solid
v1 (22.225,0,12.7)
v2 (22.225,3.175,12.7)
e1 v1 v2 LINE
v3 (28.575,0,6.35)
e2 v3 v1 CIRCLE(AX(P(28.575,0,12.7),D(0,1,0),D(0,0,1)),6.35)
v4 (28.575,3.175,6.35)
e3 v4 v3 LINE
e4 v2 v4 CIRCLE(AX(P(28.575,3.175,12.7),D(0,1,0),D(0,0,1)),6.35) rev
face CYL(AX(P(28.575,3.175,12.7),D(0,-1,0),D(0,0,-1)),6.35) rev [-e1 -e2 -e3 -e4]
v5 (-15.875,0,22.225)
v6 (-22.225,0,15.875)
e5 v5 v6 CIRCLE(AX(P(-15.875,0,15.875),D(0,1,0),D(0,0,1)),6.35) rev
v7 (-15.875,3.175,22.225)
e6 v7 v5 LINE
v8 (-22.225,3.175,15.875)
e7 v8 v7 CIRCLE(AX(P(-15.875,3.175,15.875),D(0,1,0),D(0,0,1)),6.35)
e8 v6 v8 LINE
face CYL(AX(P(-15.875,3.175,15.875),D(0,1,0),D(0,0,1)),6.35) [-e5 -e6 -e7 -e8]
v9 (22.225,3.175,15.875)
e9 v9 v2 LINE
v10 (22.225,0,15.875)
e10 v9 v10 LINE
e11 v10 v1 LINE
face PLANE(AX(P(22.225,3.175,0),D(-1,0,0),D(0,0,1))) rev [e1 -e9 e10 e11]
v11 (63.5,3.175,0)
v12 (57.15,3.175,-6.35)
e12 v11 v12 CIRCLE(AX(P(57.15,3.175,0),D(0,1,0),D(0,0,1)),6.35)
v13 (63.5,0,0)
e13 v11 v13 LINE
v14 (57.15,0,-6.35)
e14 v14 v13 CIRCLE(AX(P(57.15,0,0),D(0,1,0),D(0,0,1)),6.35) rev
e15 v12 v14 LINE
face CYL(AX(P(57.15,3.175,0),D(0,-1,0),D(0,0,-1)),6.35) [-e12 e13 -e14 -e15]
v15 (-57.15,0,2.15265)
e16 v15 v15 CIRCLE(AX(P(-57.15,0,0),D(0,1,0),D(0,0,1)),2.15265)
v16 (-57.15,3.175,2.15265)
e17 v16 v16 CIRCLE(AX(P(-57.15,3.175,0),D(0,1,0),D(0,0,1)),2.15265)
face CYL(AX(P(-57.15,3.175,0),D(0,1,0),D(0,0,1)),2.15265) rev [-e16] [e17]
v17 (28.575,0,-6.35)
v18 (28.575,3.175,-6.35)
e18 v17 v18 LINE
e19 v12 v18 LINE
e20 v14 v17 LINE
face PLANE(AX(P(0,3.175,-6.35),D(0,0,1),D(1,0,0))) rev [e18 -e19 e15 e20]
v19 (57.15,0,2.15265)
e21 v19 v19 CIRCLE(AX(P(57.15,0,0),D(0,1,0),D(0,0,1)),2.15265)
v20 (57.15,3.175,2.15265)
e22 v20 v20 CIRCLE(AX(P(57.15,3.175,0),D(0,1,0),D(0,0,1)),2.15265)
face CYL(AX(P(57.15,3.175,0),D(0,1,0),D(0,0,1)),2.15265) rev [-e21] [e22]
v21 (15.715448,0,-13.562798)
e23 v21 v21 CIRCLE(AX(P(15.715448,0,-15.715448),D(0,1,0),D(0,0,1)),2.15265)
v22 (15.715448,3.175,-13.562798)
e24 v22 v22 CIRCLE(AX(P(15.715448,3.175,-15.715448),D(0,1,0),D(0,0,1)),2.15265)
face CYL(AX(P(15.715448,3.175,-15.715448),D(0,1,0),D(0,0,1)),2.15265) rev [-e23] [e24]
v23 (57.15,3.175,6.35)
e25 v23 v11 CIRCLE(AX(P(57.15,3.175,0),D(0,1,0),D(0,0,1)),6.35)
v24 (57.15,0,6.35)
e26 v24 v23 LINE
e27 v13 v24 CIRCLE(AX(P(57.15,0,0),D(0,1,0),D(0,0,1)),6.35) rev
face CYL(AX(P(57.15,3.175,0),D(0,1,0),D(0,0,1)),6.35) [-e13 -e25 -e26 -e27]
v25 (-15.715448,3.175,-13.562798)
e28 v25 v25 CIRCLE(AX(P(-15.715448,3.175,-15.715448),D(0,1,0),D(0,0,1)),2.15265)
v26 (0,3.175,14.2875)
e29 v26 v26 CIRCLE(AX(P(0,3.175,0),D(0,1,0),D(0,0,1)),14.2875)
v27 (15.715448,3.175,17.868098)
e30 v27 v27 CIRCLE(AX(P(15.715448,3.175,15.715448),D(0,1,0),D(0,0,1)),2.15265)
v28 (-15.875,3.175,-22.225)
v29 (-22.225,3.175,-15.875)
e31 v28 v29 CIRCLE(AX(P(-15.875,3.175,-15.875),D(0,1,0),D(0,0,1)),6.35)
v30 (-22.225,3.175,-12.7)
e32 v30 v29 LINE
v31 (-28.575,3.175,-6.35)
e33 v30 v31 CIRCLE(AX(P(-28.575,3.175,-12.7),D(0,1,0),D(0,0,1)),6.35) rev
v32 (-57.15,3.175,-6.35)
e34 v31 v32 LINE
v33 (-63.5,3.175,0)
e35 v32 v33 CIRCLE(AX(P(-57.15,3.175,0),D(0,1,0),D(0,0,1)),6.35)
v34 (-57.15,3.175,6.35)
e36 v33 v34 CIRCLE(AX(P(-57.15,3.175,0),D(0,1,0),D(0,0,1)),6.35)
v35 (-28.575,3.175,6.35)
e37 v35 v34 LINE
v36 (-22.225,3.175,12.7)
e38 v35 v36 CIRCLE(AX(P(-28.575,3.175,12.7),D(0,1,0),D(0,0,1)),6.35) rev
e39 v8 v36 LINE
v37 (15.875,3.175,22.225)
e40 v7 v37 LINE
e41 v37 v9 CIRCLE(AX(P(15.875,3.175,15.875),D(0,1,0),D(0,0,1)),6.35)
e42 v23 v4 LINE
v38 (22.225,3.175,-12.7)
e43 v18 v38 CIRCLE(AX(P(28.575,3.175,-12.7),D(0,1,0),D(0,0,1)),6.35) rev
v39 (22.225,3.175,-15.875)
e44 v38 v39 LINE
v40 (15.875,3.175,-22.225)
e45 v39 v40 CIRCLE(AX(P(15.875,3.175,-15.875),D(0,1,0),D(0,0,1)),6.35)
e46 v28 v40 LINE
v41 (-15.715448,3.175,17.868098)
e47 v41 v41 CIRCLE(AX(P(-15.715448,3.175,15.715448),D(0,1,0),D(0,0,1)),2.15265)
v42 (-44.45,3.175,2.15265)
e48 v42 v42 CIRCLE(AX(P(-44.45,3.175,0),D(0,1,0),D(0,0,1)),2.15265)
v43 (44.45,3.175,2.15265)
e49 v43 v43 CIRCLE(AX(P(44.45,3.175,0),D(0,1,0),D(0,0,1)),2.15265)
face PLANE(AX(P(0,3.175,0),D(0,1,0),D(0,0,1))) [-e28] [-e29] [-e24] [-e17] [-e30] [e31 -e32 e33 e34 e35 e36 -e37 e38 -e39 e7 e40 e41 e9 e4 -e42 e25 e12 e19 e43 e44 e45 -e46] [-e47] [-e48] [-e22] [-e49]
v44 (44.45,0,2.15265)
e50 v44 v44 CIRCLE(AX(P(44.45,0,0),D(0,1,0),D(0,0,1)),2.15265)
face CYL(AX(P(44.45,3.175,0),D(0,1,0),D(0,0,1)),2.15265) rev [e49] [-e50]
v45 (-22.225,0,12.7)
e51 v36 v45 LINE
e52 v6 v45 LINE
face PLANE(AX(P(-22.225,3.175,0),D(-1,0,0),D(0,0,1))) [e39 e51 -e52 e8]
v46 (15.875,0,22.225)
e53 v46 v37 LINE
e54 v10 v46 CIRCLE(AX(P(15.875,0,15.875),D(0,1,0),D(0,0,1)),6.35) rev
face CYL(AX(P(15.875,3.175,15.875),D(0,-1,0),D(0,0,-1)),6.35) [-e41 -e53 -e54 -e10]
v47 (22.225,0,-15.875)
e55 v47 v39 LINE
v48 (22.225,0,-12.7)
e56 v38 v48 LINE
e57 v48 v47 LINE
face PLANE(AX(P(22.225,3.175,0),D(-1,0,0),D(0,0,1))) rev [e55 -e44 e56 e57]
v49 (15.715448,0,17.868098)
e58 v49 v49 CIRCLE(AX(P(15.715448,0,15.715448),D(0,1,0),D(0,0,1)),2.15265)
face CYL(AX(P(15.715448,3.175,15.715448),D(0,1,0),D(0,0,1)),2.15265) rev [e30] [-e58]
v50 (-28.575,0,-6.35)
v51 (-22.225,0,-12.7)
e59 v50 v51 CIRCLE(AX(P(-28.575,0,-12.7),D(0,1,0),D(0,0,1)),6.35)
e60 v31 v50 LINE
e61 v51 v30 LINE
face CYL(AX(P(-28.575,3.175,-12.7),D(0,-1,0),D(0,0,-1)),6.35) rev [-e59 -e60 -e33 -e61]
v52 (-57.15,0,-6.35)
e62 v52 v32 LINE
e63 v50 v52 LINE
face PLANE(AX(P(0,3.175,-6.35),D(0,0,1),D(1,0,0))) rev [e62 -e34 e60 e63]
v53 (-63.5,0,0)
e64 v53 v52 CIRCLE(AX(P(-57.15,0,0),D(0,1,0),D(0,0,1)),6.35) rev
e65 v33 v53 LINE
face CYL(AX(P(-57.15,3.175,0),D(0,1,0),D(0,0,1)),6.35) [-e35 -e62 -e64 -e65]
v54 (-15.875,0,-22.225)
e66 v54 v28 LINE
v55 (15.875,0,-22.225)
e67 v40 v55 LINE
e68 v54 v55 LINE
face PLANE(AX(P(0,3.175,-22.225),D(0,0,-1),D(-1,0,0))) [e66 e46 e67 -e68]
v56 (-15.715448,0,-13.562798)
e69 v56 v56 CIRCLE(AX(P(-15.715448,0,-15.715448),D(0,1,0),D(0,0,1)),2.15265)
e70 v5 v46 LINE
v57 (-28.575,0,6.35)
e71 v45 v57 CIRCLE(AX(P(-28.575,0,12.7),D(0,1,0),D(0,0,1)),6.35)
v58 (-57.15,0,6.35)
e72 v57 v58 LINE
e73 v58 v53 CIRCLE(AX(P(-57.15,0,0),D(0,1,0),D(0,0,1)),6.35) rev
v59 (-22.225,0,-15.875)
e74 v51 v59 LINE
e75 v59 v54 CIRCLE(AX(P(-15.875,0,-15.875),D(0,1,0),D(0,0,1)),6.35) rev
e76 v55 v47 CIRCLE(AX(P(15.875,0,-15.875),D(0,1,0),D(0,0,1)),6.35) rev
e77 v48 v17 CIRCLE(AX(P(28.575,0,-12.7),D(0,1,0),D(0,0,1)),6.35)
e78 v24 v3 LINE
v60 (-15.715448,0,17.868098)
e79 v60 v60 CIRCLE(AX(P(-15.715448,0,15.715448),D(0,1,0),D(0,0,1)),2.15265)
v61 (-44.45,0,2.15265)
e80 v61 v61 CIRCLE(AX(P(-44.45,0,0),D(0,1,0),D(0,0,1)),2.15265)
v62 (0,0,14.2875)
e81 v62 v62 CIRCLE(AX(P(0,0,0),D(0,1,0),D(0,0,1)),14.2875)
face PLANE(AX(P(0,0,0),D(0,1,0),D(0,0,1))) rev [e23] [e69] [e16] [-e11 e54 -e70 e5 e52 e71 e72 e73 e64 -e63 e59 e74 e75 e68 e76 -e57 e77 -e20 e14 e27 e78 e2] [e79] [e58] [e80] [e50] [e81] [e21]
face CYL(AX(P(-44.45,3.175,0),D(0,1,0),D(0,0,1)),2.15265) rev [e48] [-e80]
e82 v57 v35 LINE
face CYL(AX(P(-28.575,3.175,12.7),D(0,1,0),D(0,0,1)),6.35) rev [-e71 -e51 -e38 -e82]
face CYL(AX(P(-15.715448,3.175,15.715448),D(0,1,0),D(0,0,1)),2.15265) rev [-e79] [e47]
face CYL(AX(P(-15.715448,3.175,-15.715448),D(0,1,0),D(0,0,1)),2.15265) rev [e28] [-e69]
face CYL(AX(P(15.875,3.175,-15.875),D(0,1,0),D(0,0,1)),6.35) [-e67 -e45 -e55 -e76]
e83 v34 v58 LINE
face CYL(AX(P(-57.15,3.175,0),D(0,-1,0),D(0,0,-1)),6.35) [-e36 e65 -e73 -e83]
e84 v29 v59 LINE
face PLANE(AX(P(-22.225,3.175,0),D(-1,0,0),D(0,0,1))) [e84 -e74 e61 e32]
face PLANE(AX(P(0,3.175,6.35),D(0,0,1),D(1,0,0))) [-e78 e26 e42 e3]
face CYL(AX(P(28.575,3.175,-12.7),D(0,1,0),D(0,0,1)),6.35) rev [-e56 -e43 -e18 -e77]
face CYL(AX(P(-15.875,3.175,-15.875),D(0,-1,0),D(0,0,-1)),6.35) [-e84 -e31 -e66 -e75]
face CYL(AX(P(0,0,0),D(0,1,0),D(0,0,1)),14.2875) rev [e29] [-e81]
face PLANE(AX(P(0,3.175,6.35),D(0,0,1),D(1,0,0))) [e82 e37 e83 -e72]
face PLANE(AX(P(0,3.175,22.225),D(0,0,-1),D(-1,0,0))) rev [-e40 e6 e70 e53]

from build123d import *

# Parameters (mm, degrees)
SKETCH1_W                    = 44.45
SKETCH1_H                    = 12.7
SKETCH1_H_2                  = 15.875
SKETCH1_W_2                  = 41.275
BOSS_EXTRUDE1_DEPTH          = 3.175
SKETCH3_R                    = 14.2875
CUT_EXTRUDE1_DEPTH           = 68.351920908
F_18_0_1695_DIAMETER_HOLE1_D = 4.3053
CIRPATTERN1_COUNT            = 4
FILLET1_R                    = 6.35
FILLET2_R                    = 6.35
F_18_0_1695_DIAMETER_HOLE2_D = 4.3053


with BuildPart() as part:
    # Sketch1 → Boss-Extrude1 (new body)
    with BuildSketch(Plane(origin=(0, 0, 0), x_dir=(1, 0, 0), z_dir=(0, 1, 0))):
        Rectangle(SKETCH1_W, SKETCH1_H)
        with Locations((0, -14.2875)):
            Rectangle(SKETCH1_W, SKETCH1_H_2)
        with Locations((42.8625, 0)):
            Rectangle(SKETCH1_W_2, SKETCH1_H)
        with Locations((0, 14.2875)):
            Rectangle(SKETCH1_W, SKETCH1_H_2)
        with Locations((-42.8625, 0)):
            Rectangle(SKETCH1_W_2, SKETCH1_H)
    extrude(amount=BOSS_EXTRUDE1_DEPTH)

    # Sketch3 → Cut-Extrude1 (cut, through all)
    with BuildSketch(Plane(origin=(0, 3.175, 0), x_dir=(1, 0, 0), z_dir=(0, 1, 0))):
        with Locations(Location((0, 0, 0), (0, 0, 270))):
            Circle(SKETCH3_R)
    extrude(amount=-CUT_EXTRUDE1_DEPTH, mode=Mode.SUBTRACT)

    # #18 (0.1695) Diameter Hole1 (through all)
    with Locations(Plane(origin=(0, 3.175, 0), x_dir=(1, 0, 0), z_dir=(0, 1, 0))):
        with Locations((-15.715448212, -15.715448212)):
            f_18_0_1695_diameter_hole1 = Hole(F_18_0_1695_DIAMETER_HOLE1_D / 2)

    # CirPattern1: #18 (0.1695) Diameter Hole1 ×4 about axis
    cirpattern1_axis = Axis((0, 0, 0), (0, 1, 0))
    for i in range(1, CIRPATTERN1_COUNT):
        add(f_18_0_1695_diameter_hole1.rotate(cirpattern1_axis, i * 360 / CIRPATTERN1_COUNT), mode=Mode.SUBTRACT)

    # Fillet1
    fillet1_edges = [part.edges().sort_by_distance(p)[0] for p in [
        (-22.225, 1.5875, 6.35),
        (-22.225, 1.5875, -6.35),
        (22.225, 1.5875, -6.35),
        (22.225, 1.5875, 6.35),
    ]]
    fillet(fillet1_edges, radius=FILLET1_R)

    # Fillet2
    fillet2_edges = [part.edges().sort_by_distance(p)[0] for p in [
        (-63.5, 1.5875, 6.35),
        (-63.5, 1.5875, -6.35),
        (-22.225, 1.5875, -22.225),
        (22.225, 1.5875, -22.225),
        (63.5, 1.5875, -6.35),
        (63.5, 1.5875, 6.35),
        (22.225, 1.5875, 22.225),
        (-22.225, 1.5875, 22.225),
    ]]
    fillet(fillet2_edges, radius=FILLET2_R - 0.0001)  # a hair under: the kernel refuses the full size

    # #18 (0.1695) Diameter Hole2 (through all)
    with Locations(Plane(origin=(0, 3.175, 0), x_dir=(1, 0, 0), z_dir=(0, 1, 0))):
        with Locations((44.45, 0), (57.15, 0)):
            f_18_0_1695_diameter_hole2 = Hole(F_18_0_1695_DIAMETER_HOLE2_D / 2)

    # Mirror1: #18 (0.1695) Diameter Hole2 across plane
    add(f_18_0_1695_diameter_hole2.mirror(Plane(origin=(0, 0, 0), x_dir=(0, 0, 1), z_dir=(1, 0, 0))), mode=Mode.SUBTRACT)


solid = part.part
